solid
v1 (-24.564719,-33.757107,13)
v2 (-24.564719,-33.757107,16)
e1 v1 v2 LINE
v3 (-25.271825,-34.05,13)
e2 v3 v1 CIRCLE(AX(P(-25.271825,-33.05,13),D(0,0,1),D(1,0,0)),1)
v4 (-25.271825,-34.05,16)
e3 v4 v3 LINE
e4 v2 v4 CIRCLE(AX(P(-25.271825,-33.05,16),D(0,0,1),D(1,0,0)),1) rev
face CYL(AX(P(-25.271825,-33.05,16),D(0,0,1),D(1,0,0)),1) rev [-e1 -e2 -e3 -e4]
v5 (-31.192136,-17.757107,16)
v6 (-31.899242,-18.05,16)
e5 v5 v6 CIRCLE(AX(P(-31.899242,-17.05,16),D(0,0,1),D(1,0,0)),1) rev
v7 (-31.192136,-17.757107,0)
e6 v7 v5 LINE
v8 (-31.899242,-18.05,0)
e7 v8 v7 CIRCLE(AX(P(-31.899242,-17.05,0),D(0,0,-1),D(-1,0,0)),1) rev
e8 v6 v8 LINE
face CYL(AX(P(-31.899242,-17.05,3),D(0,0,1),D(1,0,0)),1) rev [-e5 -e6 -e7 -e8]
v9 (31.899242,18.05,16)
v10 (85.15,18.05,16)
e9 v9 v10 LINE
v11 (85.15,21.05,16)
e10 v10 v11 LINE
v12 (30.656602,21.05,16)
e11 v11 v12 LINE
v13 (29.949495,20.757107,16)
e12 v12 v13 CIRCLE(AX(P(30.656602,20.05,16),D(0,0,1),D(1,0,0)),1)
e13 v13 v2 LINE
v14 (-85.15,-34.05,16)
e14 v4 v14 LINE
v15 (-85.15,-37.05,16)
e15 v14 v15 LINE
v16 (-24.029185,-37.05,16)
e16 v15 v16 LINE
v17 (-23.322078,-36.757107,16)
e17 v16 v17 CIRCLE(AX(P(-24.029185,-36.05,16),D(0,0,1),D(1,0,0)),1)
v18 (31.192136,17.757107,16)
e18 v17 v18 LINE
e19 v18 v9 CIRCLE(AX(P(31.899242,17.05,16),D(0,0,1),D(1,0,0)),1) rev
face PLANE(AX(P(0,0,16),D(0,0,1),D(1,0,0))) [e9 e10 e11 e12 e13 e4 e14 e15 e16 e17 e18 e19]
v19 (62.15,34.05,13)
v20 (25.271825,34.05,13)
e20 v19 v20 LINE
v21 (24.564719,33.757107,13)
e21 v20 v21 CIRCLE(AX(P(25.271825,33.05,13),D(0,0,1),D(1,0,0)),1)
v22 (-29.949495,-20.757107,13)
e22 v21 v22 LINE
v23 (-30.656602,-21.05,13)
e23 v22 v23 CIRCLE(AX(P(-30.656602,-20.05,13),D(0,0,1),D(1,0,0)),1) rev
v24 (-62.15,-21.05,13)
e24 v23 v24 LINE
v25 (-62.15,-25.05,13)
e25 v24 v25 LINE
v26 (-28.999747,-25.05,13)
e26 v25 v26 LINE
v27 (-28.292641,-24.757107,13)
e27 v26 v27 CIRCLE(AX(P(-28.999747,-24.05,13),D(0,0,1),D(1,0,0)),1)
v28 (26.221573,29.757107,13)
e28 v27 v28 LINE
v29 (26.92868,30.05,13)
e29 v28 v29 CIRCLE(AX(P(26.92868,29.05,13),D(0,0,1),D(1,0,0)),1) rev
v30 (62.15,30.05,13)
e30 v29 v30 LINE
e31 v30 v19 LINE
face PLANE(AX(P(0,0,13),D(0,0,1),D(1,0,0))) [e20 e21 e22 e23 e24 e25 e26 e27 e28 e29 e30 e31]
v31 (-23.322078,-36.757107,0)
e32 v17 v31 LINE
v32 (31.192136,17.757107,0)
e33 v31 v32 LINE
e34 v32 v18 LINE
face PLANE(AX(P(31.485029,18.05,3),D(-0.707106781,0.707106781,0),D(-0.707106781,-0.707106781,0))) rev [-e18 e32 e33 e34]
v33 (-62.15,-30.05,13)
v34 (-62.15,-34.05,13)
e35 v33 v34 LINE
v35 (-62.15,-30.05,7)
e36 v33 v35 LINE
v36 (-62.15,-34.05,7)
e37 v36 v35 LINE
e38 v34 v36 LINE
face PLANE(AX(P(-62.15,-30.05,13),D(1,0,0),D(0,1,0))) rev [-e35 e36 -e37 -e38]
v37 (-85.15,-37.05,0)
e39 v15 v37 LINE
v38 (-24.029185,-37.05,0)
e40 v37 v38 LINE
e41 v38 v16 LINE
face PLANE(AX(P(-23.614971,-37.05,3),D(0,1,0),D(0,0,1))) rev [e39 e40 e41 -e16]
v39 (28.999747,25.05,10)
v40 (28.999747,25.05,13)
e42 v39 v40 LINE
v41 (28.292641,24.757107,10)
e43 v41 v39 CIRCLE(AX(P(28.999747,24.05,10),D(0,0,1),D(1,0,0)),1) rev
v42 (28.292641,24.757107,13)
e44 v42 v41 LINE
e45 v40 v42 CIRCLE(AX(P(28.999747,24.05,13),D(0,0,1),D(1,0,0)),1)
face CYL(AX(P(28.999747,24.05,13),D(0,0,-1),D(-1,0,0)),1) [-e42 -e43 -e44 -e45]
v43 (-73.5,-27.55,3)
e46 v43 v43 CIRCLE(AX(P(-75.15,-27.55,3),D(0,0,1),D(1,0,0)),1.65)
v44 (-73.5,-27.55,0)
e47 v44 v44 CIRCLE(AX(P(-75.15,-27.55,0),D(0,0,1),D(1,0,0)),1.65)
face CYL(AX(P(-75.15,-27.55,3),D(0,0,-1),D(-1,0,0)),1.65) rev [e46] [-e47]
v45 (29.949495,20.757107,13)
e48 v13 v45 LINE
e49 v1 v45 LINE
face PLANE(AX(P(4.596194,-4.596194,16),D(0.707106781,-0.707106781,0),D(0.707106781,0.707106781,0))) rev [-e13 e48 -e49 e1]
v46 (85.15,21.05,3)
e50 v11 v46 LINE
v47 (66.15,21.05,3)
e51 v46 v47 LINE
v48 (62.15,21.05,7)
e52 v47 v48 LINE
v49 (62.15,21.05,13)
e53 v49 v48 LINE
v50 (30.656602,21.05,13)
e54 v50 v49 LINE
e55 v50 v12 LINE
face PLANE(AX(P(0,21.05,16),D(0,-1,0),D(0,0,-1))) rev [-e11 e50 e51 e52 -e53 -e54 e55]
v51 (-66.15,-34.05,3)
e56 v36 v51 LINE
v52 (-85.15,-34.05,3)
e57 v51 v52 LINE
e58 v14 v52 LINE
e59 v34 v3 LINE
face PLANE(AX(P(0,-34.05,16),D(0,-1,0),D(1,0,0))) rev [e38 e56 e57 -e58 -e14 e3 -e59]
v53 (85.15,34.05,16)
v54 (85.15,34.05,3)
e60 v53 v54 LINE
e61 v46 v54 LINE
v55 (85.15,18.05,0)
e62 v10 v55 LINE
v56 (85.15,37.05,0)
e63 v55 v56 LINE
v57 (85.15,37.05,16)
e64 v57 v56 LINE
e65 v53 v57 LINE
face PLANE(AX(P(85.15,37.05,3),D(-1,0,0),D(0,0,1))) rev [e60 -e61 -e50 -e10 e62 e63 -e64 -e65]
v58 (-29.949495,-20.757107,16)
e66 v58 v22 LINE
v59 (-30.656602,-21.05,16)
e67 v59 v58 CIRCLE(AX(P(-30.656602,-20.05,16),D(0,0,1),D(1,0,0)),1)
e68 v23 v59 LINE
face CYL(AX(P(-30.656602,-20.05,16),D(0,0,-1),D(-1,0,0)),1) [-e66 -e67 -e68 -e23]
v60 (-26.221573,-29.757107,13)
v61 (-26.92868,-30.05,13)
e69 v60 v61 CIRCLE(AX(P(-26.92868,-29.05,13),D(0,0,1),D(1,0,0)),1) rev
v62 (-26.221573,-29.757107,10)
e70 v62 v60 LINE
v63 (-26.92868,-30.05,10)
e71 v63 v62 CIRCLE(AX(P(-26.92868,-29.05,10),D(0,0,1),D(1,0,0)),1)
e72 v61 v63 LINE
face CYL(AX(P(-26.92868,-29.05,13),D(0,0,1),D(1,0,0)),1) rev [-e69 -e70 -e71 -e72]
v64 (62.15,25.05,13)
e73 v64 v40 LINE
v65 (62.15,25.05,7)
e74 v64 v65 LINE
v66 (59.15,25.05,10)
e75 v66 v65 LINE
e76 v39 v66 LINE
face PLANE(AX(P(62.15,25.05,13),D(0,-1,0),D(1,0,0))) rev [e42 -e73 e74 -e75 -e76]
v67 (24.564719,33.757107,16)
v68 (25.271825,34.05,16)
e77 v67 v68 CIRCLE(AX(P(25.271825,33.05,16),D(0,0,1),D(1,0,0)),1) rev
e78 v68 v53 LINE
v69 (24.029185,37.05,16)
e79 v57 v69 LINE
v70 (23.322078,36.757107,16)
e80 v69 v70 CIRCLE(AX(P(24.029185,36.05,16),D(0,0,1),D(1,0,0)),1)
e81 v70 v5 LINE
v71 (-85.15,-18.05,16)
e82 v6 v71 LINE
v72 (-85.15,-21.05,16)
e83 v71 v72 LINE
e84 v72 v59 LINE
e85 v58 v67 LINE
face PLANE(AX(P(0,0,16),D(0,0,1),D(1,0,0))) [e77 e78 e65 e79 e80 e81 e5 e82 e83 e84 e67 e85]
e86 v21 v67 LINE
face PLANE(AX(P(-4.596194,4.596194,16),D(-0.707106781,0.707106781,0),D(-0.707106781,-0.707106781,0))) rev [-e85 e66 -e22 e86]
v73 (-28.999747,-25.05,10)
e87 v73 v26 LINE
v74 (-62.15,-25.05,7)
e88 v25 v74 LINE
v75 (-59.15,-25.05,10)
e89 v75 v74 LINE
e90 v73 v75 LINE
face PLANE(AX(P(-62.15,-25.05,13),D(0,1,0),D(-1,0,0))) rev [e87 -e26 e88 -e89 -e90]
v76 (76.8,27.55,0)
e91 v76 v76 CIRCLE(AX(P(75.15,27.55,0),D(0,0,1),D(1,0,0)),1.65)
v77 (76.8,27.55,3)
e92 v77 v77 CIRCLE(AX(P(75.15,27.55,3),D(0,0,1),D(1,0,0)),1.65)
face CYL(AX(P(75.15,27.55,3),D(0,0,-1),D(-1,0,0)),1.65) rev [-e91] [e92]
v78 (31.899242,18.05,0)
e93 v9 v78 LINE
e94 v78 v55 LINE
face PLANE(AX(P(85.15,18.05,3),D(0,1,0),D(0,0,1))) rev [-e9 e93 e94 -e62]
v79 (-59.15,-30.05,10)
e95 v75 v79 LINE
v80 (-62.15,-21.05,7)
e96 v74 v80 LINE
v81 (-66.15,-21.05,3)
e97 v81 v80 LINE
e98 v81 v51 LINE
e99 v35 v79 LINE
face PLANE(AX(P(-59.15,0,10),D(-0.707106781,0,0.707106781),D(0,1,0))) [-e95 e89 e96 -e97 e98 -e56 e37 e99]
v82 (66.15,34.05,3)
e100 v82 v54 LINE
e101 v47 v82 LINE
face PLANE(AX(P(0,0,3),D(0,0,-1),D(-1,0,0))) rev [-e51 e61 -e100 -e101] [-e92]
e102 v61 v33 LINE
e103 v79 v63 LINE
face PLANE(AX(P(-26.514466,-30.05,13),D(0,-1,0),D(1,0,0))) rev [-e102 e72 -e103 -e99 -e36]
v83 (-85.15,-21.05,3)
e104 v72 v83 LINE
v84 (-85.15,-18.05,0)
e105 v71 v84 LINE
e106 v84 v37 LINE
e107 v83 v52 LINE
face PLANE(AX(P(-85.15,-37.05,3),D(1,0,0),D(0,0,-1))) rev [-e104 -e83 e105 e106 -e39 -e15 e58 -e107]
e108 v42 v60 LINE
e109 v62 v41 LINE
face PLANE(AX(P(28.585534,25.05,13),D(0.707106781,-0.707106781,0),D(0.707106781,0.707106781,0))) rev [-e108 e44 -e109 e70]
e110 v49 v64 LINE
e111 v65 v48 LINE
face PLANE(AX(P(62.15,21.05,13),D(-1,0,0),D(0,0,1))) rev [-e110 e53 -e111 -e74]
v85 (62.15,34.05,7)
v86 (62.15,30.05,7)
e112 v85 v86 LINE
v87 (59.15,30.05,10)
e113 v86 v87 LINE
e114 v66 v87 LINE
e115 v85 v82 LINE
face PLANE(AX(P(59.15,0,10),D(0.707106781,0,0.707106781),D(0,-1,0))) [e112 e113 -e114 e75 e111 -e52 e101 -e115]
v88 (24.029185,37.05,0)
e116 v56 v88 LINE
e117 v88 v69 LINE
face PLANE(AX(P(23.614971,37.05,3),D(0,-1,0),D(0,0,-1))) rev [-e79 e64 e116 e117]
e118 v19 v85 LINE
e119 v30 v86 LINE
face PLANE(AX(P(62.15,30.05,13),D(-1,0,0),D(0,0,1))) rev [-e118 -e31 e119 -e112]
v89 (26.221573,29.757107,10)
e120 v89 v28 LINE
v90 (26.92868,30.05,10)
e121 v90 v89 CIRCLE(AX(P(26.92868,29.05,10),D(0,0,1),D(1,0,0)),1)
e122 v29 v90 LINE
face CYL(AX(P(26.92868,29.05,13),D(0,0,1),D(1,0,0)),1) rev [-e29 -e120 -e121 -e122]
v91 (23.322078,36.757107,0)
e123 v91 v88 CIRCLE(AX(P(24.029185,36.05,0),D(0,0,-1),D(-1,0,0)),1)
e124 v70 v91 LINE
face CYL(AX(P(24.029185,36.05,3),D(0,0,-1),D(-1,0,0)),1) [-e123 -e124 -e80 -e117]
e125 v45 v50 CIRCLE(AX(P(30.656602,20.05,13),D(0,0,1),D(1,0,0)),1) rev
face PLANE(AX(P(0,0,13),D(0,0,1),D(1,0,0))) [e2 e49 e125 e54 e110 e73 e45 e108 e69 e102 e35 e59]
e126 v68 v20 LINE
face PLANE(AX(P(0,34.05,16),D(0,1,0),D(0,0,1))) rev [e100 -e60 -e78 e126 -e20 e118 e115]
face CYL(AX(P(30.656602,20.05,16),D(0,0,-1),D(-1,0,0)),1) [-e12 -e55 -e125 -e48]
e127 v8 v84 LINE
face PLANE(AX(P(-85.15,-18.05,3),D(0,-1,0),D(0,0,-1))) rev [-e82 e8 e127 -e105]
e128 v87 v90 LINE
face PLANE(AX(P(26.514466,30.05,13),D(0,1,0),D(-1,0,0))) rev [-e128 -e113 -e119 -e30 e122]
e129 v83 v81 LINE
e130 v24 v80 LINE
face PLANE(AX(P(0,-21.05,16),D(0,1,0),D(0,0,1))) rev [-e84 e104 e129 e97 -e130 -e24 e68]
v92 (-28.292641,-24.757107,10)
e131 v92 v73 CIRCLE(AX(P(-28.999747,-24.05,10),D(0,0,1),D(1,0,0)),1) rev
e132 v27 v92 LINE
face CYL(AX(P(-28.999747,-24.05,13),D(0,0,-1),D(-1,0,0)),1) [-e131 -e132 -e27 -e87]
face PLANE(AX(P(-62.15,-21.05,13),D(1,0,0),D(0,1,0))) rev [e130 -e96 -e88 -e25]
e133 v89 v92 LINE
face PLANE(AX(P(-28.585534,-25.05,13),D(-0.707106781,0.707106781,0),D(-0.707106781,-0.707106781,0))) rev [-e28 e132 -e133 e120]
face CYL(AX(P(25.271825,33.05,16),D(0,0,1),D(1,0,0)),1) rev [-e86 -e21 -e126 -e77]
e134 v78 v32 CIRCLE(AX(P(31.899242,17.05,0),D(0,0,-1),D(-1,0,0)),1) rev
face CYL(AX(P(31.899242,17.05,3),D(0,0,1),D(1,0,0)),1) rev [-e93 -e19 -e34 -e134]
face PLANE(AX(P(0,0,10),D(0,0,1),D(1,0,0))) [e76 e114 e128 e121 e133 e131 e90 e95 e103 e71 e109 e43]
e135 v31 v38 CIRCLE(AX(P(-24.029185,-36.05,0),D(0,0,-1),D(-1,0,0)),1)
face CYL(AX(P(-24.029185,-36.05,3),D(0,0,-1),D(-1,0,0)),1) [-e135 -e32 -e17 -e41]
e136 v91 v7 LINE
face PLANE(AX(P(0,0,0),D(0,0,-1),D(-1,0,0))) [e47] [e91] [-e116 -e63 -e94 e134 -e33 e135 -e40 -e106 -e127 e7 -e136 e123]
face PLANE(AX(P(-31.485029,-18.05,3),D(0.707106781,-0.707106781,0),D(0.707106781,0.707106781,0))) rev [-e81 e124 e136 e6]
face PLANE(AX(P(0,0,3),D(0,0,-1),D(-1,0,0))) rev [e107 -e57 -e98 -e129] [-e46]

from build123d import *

# Parameters (mm, degrees)
SKETCH_10_R     = 1.65
EXTRUDE_1_DEPTH = 3
EXTRUDE_START   = 3
EXTRUDE_2_DEPTH = 7
EXTRUDE_3_DEPTH = 13
CHAMFER_1_SIZE  = 7
EXTRUDE_5_DEPTH = 10
FILLET_1_R      = 1


with BuildPart() as part:
    # 草图10 → 凸台-拉伸1 (new body)
    with BuildSketch(Plane.XY):
        Polygon((-85.15, -18.05), (-31.485028843, -18.05), (23.614971157, 37.05), (85.15, 37.05), (85.15, 18.05), (31.485028843, 18.05), (-23.614971157, -37.05), (-85.15, -37.05), align=None)
        with Locations((-75.15, -27.55)):
            Circle(SKETCH_10_R, mode=Mode.SUBTRACT)
        with Locations((75.15, 27.55)):
            Circle(SKETCH_10_R, mode=Mode.SUBTRACT)
    extrude(amount=EXTRUDE_1_DEPTH)

    # 草图11 → 凸台-拉伸2 (add)
    with BuildSketch(Plane.XY.offset(EXTRUDE_START)):
        Polygon((-66.15, -18.05), (-66.15, -37.05), (-23.614971157, -37.05), (31.485028843, 18.05), (66.15, 18.05), (66.15, 37.05), (23.614971157, 37.05), (-31.485028843, -18.05), align=None)
    extrude(amount=EXTRUDE_2_DEPTH)

    # 草图12 → 凸台-拉伸3 (add)
    with BuildSketch(Plane.XY.offset(EXTRUDE_START)):
        Polygon((-85.15, -18.05), (-31.485028843, -18.05), (23.614971157, 37.05), (85.15, 37.05), (85.15, 34.05), (24.857611845, 34.05), (-30.242388155, -21.05), (-85.15, -21.05), align=None)
        Polygon((-85.15, -34.05), (-85.15, -37.05), (-23.614971157, -37.05), (31.485028843, 18.05), (85.15, 18.05), (85.15, 21.05), (30.242388155, 21.05), (-24.857611845, -34.05), align=None)
    extrude(amount=EXTRUDE_3_DEPTH)

    # 倒角1
    chamfer_1_edges = [part.edges().sort_by_distance(p)[0] for p in [
        (66.15, 27.55, 10),
        (-66.15, -27.55, 10),
    ]]
    chamfer(chamfer_1_edges, length=CHAMFER_1_SIZE - 0.0001)  # a hair under: the kernel refuses the full size

    # 草图15 → 凸台-拉伸5 (add)
    with BuildSketch(Plane.XY.offset(3)):
        Polygon((-62.15, -21.05), (-62.15, -25.05), (-28.585533906, -25.05), (26.514466094, 30.05), (62.15, 30.05), (62.15, 34.05), (24.857611845, 34.05), (-30.242388155, -21.05), align=None)
        Polygon((-62.15, -30.05), (-62.15, -34.05), (-24.857611845, -34.05), (30.242388155, 21.05), (62.15, 21.05), (62.15, 25.05), (28.585533906, 25.05), (-26.514466094, -30.05), align=None)
    extrude(amount=EXTRUDE_5_DEPTH)

    # 圆角1
    fillet_1_edges = [part.edges().sort_by_distance(p)[0] for p in [
        (-31.485028843, -18.05, 8),
        (23.614971157, 37.05, 8),
        (31.485028843, 18.05, 8),
        (-23.614971157, -37.05, 8),
        (-28.585533906, -25.05, 11.5),
        (26.514466094, 30.05, 11.5),
        (-26.514466094, -30.05, 11.5),
        (28.585533906, 25.05, 11.5),
        (24.857611845, 34.05, 14.5),
        (-30.242388155, -21.05, 14.5),
        (-24.857611845, -34.05, 14.5),
        (30.242388155, 21.05, 14.5),
    ]]
    fillet(fillet_1_edges, radius=FILLET_1_R)


solid = part.part
